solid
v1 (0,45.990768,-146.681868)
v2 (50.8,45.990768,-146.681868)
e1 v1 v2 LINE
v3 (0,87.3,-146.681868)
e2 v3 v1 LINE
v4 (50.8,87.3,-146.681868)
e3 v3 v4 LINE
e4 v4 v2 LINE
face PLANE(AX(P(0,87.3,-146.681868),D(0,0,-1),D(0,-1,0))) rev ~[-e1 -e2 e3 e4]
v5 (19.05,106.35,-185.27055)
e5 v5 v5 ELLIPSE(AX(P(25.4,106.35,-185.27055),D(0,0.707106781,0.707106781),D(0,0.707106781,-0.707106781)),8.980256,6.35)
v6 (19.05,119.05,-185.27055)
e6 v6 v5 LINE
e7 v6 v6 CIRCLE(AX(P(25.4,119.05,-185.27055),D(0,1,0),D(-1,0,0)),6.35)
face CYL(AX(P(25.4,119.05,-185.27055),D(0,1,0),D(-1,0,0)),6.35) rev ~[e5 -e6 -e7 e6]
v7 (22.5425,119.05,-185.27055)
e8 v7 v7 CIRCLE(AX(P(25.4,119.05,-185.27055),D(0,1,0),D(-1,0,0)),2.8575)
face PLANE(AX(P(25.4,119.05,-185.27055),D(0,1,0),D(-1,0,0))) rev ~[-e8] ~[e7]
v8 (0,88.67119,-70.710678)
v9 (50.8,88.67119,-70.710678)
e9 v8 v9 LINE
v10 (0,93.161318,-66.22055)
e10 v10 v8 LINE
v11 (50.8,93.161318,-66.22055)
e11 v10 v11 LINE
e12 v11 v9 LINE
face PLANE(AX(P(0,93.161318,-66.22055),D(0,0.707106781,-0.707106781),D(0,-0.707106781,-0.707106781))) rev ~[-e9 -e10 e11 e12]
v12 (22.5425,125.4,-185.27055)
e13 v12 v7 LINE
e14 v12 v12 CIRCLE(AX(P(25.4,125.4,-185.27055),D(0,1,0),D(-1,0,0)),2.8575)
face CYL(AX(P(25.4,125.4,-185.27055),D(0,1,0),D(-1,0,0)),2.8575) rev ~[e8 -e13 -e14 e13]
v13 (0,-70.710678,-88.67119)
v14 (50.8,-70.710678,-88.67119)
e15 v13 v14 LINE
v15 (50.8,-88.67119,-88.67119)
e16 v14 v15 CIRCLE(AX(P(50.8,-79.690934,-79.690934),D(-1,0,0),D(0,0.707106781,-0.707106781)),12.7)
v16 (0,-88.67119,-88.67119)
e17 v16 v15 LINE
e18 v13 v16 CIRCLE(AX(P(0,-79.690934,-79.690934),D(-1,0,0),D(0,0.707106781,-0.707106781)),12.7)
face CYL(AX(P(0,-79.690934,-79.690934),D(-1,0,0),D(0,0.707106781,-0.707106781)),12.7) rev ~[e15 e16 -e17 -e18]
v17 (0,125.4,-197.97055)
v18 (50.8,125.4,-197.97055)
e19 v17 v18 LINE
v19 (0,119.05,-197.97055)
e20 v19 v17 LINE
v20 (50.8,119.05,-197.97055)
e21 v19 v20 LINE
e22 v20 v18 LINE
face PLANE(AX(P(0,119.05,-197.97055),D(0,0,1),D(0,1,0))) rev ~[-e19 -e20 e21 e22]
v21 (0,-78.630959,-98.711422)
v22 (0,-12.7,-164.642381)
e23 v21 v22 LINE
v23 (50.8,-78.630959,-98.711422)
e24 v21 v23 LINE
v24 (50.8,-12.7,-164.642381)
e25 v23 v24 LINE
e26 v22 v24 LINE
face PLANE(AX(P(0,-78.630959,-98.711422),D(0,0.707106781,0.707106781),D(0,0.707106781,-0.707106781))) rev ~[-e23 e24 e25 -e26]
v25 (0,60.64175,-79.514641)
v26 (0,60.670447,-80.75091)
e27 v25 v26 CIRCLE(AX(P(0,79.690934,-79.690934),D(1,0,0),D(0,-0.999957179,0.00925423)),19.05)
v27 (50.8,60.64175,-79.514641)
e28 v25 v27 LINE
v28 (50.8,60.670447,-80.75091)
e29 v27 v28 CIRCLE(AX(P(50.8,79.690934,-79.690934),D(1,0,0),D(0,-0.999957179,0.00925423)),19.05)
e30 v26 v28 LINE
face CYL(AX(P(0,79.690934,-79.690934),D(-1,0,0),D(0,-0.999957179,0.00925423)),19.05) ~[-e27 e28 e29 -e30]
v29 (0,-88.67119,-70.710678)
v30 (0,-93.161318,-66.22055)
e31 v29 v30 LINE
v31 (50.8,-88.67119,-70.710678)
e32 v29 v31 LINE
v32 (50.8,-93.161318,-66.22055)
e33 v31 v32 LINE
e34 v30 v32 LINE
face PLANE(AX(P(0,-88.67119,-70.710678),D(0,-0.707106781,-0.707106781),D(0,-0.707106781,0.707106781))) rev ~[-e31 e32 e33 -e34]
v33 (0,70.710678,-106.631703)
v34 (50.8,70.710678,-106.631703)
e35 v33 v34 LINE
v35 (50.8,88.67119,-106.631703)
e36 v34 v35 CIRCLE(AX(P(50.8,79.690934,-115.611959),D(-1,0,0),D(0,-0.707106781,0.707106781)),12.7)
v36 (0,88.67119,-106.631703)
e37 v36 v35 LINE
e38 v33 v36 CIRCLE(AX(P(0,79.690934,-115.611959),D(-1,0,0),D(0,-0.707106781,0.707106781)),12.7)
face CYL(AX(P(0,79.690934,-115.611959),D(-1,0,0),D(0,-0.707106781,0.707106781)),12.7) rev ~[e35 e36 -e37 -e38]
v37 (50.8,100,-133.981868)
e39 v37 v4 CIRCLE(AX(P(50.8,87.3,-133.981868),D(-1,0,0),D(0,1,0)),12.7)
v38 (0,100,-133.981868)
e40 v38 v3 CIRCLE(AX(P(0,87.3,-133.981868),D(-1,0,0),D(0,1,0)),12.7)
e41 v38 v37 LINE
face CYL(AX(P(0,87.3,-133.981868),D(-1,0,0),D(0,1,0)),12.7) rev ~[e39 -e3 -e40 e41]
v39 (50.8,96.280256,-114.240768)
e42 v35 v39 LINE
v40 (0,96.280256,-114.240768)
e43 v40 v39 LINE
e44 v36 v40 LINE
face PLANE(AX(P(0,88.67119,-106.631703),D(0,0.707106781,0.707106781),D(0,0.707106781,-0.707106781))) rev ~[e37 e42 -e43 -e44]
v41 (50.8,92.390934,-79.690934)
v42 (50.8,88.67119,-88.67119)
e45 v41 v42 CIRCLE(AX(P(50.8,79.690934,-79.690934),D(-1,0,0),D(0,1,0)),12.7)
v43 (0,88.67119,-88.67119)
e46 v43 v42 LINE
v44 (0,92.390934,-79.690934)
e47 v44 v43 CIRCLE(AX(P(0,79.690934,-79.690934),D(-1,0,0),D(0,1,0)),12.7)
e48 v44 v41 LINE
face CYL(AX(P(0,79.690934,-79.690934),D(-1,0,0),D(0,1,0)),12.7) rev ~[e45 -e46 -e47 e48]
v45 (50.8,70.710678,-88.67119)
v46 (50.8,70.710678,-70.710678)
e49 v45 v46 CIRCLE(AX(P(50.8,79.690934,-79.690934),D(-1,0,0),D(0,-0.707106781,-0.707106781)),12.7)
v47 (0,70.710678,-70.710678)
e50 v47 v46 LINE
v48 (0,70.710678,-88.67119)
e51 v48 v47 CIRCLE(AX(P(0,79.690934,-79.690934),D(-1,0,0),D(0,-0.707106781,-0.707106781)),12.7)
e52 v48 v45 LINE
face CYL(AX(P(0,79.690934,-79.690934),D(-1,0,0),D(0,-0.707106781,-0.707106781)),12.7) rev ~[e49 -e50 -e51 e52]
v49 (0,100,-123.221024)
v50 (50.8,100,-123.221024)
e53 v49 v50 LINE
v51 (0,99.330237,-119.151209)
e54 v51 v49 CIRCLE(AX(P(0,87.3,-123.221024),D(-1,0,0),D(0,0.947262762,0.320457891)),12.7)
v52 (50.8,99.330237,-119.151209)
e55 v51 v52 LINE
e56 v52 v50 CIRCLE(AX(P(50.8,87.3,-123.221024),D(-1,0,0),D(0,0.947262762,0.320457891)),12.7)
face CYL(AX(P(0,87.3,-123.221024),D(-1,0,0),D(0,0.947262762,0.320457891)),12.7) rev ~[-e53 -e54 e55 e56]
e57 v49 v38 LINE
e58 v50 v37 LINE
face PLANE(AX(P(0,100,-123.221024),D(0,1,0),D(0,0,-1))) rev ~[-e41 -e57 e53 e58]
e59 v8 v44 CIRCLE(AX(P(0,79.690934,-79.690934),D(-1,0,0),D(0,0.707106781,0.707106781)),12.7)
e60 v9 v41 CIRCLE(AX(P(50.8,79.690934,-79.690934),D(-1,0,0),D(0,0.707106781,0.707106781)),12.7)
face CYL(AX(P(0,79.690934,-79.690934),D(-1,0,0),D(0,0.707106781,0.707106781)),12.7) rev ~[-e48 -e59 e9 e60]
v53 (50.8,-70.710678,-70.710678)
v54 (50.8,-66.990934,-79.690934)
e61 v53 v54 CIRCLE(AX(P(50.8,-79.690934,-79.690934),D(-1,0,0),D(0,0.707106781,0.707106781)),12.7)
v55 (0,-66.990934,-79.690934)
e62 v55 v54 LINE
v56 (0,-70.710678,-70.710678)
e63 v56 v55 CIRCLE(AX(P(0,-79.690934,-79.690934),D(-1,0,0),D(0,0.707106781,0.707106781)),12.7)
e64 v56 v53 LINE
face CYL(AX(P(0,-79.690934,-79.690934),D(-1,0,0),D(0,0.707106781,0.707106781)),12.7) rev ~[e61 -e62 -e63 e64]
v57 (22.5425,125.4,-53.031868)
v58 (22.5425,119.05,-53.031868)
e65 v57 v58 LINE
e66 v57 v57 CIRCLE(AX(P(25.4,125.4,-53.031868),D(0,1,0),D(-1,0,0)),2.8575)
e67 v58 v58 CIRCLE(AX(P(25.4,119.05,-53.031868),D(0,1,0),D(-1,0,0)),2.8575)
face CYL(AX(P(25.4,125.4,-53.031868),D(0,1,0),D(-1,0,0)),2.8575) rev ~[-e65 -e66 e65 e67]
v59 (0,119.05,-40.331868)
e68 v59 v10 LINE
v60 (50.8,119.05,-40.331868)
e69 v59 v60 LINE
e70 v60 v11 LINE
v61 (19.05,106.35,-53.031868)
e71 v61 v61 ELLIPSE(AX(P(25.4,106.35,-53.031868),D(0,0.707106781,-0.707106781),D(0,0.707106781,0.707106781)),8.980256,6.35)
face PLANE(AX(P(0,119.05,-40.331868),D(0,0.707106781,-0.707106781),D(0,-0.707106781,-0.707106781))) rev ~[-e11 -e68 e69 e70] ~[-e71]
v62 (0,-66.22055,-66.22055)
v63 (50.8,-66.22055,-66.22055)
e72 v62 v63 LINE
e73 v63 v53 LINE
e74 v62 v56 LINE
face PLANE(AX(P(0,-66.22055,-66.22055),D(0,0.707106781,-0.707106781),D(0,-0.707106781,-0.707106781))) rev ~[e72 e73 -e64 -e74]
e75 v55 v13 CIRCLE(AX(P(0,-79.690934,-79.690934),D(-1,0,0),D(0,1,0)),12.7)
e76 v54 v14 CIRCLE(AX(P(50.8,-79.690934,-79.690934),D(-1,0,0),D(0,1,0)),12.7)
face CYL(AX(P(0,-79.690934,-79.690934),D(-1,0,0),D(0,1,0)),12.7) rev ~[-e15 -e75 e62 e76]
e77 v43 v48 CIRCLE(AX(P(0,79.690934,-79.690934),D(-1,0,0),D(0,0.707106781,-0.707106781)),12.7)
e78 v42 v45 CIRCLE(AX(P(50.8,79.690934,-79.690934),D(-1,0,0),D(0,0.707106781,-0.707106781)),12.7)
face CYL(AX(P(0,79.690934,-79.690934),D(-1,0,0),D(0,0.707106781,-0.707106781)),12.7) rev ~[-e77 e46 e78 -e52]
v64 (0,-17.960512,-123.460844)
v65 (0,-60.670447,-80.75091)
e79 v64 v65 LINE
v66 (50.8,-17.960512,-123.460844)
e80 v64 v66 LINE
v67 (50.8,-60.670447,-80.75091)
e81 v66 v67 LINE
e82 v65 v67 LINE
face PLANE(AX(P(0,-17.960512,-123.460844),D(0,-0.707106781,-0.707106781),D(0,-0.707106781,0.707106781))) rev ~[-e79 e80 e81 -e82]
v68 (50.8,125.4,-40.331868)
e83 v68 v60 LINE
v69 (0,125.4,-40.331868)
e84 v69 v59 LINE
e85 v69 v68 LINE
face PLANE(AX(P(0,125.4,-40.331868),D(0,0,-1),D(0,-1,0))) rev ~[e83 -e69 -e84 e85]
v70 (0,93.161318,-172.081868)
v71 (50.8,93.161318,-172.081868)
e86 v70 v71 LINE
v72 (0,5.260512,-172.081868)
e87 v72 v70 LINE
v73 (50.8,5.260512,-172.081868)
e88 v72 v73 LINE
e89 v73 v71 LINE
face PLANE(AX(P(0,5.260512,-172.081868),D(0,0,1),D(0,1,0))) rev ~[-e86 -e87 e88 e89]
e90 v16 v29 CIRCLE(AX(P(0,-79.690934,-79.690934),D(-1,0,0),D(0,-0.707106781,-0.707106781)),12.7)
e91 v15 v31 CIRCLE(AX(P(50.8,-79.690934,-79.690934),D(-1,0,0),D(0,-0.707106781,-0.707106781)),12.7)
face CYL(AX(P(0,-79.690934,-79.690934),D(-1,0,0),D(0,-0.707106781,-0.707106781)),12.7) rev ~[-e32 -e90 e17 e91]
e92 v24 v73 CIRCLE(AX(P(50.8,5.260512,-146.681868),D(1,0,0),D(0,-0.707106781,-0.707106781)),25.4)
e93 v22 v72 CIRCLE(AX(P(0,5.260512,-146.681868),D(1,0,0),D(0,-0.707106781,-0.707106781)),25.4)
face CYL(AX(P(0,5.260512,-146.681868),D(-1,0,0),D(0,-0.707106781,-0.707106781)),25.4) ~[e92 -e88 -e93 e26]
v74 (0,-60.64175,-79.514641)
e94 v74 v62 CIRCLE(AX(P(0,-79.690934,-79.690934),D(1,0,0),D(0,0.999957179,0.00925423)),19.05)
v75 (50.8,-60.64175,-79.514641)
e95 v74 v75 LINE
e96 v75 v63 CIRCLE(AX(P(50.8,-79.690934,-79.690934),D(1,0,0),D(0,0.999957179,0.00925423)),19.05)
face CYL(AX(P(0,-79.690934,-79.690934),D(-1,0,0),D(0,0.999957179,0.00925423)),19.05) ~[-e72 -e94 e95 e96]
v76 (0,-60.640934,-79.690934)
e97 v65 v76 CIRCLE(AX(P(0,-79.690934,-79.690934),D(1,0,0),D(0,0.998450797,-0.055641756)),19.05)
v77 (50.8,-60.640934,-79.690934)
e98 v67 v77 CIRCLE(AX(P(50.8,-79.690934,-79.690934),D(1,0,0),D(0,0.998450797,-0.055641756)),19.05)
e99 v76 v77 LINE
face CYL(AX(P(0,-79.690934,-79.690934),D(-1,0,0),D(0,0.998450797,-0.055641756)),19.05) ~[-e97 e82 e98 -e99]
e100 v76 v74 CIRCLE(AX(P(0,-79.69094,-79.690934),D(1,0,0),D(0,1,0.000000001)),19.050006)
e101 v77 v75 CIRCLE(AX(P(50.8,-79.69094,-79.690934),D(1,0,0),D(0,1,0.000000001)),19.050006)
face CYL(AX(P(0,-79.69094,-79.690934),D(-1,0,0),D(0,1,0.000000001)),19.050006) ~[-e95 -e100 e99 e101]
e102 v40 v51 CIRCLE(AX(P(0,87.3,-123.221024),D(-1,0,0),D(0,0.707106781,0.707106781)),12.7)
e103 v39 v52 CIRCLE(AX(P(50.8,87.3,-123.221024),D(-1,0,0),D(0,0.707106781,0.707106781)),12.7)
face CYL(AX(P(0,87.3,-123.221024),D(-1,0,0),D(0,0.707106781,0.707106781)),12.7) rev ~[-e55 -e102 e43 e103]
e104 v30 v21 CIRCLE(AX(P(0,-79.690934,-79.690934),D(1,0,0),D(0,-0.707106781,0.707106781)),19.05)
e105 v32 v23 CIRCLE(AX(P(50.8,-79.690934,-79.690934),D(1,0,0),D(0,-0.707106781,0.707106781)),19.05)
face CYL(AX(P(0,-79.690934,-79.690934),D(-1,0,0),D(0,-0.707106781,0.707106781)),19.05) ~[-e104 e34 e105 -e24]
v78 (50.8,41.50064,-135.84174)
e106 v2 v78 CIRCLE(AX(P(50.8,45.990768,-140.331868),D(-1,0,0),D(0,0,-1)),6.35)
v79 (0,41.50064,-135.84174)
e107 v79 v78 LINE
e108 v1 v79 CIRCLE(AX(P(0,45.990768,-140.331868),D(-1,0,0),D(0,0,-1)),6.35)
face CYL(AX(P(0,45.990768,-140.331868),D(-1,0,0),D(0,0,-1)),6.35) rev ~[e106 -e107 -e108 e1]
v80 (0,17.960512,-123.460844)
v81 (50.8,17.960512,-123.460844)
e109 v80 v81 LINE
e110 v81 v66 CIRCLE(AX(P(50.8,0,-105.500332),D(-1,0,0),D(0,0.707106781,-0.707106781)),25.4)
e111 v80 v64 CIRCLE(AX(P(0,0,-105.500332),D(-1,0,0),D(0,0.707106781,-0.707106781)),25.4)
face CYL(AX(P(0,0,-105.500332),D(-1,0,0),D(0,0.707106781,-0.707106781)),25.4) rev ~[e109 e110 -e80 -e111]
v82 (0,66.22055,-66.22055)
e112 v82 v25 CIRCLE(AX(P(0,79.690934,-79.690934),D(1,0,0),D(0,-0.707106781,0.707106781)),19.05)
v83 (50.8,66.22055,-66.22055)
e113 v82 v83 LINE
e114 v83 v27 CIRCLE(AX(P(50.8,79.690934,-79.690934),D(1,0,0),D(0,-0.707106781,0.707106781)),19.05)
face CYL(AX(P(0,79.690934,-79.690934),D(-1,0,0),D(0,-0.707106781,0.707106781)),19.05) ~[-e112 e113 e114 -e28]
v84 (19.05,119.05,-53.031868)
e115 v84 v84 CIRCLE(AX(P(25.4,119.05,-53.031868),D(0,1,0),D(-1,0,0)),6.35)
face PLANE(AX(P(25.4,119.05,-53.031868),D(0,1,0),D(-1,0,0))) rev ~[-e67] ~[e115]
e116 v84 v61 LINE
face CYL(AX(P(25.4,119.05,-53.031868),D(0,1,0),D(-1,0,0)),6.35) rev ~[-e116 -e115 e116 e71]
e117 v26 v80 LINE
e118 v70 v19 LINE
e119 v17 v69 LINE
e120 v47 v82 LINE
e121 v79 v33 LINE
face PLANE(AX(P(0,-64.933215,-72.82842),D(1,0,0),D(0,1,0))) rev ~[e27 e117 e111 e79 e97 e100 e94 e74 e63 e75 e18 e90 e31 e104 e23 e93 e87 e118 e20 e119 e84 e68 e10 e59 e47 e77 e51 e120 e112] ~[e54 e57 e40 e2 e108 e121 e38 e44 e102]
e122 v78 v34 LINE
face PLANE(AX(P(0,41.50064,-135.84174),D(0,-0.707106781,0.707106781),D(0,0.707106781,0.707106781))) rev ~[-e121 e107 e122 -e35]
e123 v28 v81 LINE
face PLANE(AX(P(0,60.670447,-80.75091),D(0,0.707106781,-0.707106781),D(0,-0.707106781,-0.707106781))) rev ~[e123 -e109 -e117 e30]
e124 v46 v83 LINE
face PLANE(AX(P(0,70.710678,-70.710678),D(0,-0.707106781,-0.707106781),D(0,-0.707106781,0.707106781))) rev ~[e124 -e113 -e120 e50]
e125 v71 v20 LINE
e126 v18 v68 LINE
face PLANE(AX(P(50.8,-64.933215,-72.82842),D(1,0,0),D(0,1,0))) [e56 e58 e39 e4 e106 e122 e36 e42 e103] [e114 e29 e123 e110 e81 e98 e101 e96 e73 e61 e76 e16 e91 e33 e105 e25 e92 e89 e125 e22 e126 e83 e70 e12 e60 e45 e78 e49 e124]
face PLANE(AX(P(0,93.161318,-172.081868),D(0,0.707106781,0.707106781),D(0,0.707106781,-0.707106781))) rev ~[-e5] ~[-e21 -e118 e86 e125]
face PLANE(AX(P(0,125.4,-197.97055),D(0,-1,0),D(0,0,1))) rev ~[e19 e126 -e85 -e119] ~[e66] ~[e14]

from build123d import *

# Parameters (mm, degrees)
F1_DEPTH = 50.8
F2_R     = 2.8575
F3_DEPTH = 224.1419342397
F5_R     = 6.35
F5_R_2   = 2.8575
F6_DEPTH = 217.7919342397


with BuildPart() as f1:
    # F0 (on Right) → F1 (new body)
    with BuildSketch(Plane.YZ):
        with BuildLine():
            Line((-66.2205500581, -66.2205500581), (-70.7106781187, -70.7106781187))
            ThreePointArc((-70.7106781187, -70.7106781187), (-65.8235712608, -75.2811893269), (-60.6417499855, -79.5146411593))
            ThreePointArc((-60.6417499855, -79.5146411593), (-62.1249501408, -72.3194552405), (-66.2205500581, -66.2205500581))
        make_face()
        with BuildLine():
            Line((-60.6704465476, -80.7509096897), (-70.7106781187, -70.7106781187))
            ThreePointArc((-70.7106781187, -70.7106781187), (-67.9576641768, -74.8308546487), (-66.9909342397, -79.6909342397))
            ThreePointArc((-66.9909342397, -79.6909342397), (-67.9576641768, -84.5510138308), (-70.7106781187, -88.6711903608))
            Line((-70.7106781187, -88.6711903608), (-66.2205500581, -93.1613184213))
            ThreePointArc((-66.2205500581, -93.1613184213), (-62.3007430389, -87.4680641731), (-60.6704465476, -80.7509096897))
        make_face()
        with BuildLine():
            ThreePointArc((-60.6417499855, -79.5146411593), (-65.8235712608, -75.2811893269), (-70.7106781187, -70.7106781187))
            Line((-70.7106781187, -70.7106781187), (-60.6704465476, -80.7509096897))
            ThreePointArc((-60.6704465476, -80.7509096897), (-60.648313746, -80.2211273486), (-60.6409342397, -79.6909342397))
            ThreePointArc((-60.6409342397, -79.6909342397), (-60.6411381773, -79.6027867559), (-60.6417499855, -79.5146411593))
        make_face()
        with BuildLine():
            Line((60.6704465476, -80.7509096897), (70.7106781187, -70.7106781187))
            ThreePointArc((70.7106781187, -70.7106781187), (65.8235712608, -75.2811893269), (60.6417499855, -79.5146411593))
            ThreePointArc((60.6417499855, -79.5146411593), (60.6460643138, -80.133008335), (60.6704465476, -80.7509096897))
        make_face()
        with BuildLine():
            ThreePointArc((60.6417499855, -79.5146411593), (65.8235712608, -75.2811893269), (70.7106781187, -70.7106781187))
            Line((70.7106781187, -70.7106781187), (66.2205500581, -66.2205500581))
            ThreePointArc((66.2205500581, -66.2205500581), (62.1249501408, -72.3194552405), (60.6417499855, -79.5146411593))
        make_face()
        with BuildLine():
            ThreePointArc((70.7106781187, -88.6711903608), (66.9909342397, -79.6909342397), (70.7106781187, -70.7106781187))
            Line((70.7106781187, -70.7106781187), (60.6704465476, -80.7509096897))
            ThreePointArc((60.6704465476, -80.7509096897), (62.3007430389, -87.4680641731), (66.2205500581, -93.1613184213))
            Line((66.2205500581, -93.1613184213), (70.7106781187, -88.6711903608))
        make_face()
        with BuildLine():
            ThreePointArc((98.7409342397, -79.6909342397), (97.2908393341, -72.4008148532), (93.1613184213, -66.2205500581))
            Line((93.1613184213, -66.2205500581), (88.6711903608, -70.7106781187))
            ThreePointArc((88.6711903608, -70.7106781187), (91.4242043026, -74.8308546487), (92.3909342397, -79.6909342397))
            ThreePointArc((92.3909342397, -79.6909342397), (91.4242043026, -84.5510138308), (88.6711903608, -88.6711903608))
            Line((88.6711903608, -88.6711903608), (93.1613184213, -93.1613184213))
            ThreePointArc((93.1613184213, -93.1613184213), (97.2908393341, -86.9810536263), (98.7409342397, -79.6909342397))
        make_face()
        Polygon((119.05, -40.3318684794), (93.1613184213, -66.2205500581), (125.4, -66.2205500581), (125.4, -40.3318684794), align=None)
        with BuildLine():
            Line((125.4, -66.2205500581), (93.1613184213, -66.2205500581))
            ThreePointArc((93.1613184213, -66.2205500581), (97.2908393341, -72.4008148532), (98.7409342397, -79.6909342397))
            ThreePointArc((98.7409342397, -79.6909342397), (97.2908393341, -86.9810536263), (93.1613184213, -93.1613184213))
            ThreePointArc((93.1613184213, -93.1613184213), (79.6909342397, -98.7409342397), (66.2205500581, -93.1613184213))
            Line((66.2205500581, -93.1613184213), (0, -159.3818684794))
            Line((0, -159.3818684794), (-66.2205500581, -93.1613184213))
            ThreePointArc((-66.2205500581, -93.1613184213), (-71.9138043064, -97.0811254405), (-78.6309587898, -98.7114219318))
            Line((-78.6309587898, -98.7114219318), (-12.7, -164.6423807216))
            ThreePointArc((-12.7, -164.6423807216), (-4.4596469399, -170.1484086052), (5.2605122421, -172.0818684794))
            Line((5.2605122421, -172.0818684794), (93.1613184213, -172.0818684794))
            Line((93.1613184213, -172.0818684794), (125.4, -172.0818684794))
            Line((125.4, -172.0818684794), (125.4, -119.1512092688))
            Line((125.4, -119.1512092688), (125.4, -66.2205500581))
        make_face()
        with BuildLine():
            ThreePointArc((96.2802561211, -114.2407683632), (98.0883415579, -116.5201524195), (99.3302370763, -119.1512092688))
            ThreePointArc((99.3302370763, -119.1512092688), (99.8314406767, -121.1587455105), (100, -123.2210244843))
            Line((100, -123.2210244843), (100, -133.9818684794))
            ThreePointArc((100, -133.9818684794), (96.2802561211, -142.9621246005), (87.3, -146.6818684794))
            Line((87.3, -146.6818684794), (45.9907683632, -146.6818684794))
            ThreePointArc((45.9907683632, -146.6818684794), (40.1241333318, -142.761908275), (41.5006403027, -135.8417404189))
            Line((41.5006403027, -135.8417404189), (70.7106781187, -106.6317026029))
            ThreePointArc((70.7106781187, -106.6317026029), (79.6909342397, -102.911958724), (88.6711903608, -106.6317026029))
            Line((88.6711903608, -106.6317026029), (96.2802561211, -114.2407683632))
        make_face(mode=Mode.SUBTRACT)
        with BuildLine():
            Line((-17.9605122421, -123.4608439952), (-60.6704465476, -80.7509096897))
            ThreePointArc((-60.6704465476, -80.7509096897), (-62.3007430389, -87.4680641731), (-66.2205500581, -93.1613184213))
            Line((-66.2205500581, -93.1613184213), (0, -159.3818684794))
            Line((0, -159.3818684794), (66.2205500581, -93.1613184213))
            ThreePointArc((66.2205500581, -93.1613184213), (62.3007430389, -87.4680641731), (60.6704465476, -80.7509096897))
            Line((60.6704465476, -80.7509096897), (17.9605122421, -123.4608439952))
            ThreePointArc((17.9605122421, -123.4608439952), (0, -130.900331753), (-17.9605122421, -123.4608439952))
        make_face()
        with BuildLine():
            Line((-88.6711903608, -70.7106781187), (-93.1613184213, -66.2205500581))
            ThreePointArc((-93.1613184213, -66.2205500581), (-97.0811254405, -87.4680641731), (-78.6309587898, -98.7114219318))
            Line((-78.6309587898, -98.7114219318), (-88.6711903608, -88.6711903608))
            ThreePointArc((-88.6711903608, -88.6711903608), (-92.3909342397, -79.6909342397), (-88.6711903608, -70.7106781187))
        make_face()
        with BuildLine():
            ThreePointArc((88.6711903608, -88.6711903608), (79.6909342397, -92.3909342397), (70.7106781187, -88.6711903608))
            Line((70.7106781187, -88.6711903608), (66.2205500581, -93.1613184213))
            ThreePointArc((66.2205500581, -93.1613184213), (79.6909342397, -98.7409342397), (93.1613184213, -93.1613184213))
            Line((93.1613184213, -93.1613184213), (88.6711903608, -88.6711903608))
        make_face()
        with BuildLine():
            Line((-66.2205500581, -93.1613184213), (-70.7106781187, -88.6711903608))
            ThreePointArc((-70.7106781187, -88.6711903608), (-79.6909342397, -92.3909342397), (-88.6711903608, -88.6711903608))
            Line((-88.6711903608, -88.6711903608), (-78.6309587898, -98.7114219318))
            ThreePointArc((-78.6309587898, -98.7114219318), (-71.9138043064, -97.0811254405), (-66.2205500581, -93.1613184213))
        make_face()
        Polygon((125.4, -197.9705500581), (125.4, -172.0818684794), (93.1613184213, -172.0818684794), (119.05, -197.9705500581), align=None)
    extrude(amount=F1_DEPTH)

    # F2 (on face) → F3 (cut, through all)
    with BuildSketch(Plane(origin=(0, 125.4, 0), x_dir=(-1, 0, 0), z_dir=(0, 1, 0))):
        with Locations((-25.4, -185.2705500581)):
            Circle(F2_R)
        with Locations((-25.4, -53.0318684794)):
            Circle(F2_R)
    extrude(amount=-F3_DEPTH, mode=Mode.SUBTRACT)

    # F5 (on offset) → F6 (cut, through all)
    with BuildSketch(Plane(origin=(0, 119.05, 0), x_dir=(-1, 0, 0), z_dir=(0, 1, 0))):
        with Locations((-25.4, -53.0318684794)):
            Circle(F5_R)
        with Locations((-25.4, -53.0318684794)):
            Circle(F5_R_2, mode=Mode.SUBTRACT)
        with Locations((-25.4, -185.2705500581)):
            Circle(F5_R)
        with Locations((-25.4, -185.2705500581)):
            Circle(F5_R_2, mode=Mode.SUBTRACT)
    extrude(amount=-F6_DEPTH, mode=Mode.SUBTRACT)


solid = f1.part
